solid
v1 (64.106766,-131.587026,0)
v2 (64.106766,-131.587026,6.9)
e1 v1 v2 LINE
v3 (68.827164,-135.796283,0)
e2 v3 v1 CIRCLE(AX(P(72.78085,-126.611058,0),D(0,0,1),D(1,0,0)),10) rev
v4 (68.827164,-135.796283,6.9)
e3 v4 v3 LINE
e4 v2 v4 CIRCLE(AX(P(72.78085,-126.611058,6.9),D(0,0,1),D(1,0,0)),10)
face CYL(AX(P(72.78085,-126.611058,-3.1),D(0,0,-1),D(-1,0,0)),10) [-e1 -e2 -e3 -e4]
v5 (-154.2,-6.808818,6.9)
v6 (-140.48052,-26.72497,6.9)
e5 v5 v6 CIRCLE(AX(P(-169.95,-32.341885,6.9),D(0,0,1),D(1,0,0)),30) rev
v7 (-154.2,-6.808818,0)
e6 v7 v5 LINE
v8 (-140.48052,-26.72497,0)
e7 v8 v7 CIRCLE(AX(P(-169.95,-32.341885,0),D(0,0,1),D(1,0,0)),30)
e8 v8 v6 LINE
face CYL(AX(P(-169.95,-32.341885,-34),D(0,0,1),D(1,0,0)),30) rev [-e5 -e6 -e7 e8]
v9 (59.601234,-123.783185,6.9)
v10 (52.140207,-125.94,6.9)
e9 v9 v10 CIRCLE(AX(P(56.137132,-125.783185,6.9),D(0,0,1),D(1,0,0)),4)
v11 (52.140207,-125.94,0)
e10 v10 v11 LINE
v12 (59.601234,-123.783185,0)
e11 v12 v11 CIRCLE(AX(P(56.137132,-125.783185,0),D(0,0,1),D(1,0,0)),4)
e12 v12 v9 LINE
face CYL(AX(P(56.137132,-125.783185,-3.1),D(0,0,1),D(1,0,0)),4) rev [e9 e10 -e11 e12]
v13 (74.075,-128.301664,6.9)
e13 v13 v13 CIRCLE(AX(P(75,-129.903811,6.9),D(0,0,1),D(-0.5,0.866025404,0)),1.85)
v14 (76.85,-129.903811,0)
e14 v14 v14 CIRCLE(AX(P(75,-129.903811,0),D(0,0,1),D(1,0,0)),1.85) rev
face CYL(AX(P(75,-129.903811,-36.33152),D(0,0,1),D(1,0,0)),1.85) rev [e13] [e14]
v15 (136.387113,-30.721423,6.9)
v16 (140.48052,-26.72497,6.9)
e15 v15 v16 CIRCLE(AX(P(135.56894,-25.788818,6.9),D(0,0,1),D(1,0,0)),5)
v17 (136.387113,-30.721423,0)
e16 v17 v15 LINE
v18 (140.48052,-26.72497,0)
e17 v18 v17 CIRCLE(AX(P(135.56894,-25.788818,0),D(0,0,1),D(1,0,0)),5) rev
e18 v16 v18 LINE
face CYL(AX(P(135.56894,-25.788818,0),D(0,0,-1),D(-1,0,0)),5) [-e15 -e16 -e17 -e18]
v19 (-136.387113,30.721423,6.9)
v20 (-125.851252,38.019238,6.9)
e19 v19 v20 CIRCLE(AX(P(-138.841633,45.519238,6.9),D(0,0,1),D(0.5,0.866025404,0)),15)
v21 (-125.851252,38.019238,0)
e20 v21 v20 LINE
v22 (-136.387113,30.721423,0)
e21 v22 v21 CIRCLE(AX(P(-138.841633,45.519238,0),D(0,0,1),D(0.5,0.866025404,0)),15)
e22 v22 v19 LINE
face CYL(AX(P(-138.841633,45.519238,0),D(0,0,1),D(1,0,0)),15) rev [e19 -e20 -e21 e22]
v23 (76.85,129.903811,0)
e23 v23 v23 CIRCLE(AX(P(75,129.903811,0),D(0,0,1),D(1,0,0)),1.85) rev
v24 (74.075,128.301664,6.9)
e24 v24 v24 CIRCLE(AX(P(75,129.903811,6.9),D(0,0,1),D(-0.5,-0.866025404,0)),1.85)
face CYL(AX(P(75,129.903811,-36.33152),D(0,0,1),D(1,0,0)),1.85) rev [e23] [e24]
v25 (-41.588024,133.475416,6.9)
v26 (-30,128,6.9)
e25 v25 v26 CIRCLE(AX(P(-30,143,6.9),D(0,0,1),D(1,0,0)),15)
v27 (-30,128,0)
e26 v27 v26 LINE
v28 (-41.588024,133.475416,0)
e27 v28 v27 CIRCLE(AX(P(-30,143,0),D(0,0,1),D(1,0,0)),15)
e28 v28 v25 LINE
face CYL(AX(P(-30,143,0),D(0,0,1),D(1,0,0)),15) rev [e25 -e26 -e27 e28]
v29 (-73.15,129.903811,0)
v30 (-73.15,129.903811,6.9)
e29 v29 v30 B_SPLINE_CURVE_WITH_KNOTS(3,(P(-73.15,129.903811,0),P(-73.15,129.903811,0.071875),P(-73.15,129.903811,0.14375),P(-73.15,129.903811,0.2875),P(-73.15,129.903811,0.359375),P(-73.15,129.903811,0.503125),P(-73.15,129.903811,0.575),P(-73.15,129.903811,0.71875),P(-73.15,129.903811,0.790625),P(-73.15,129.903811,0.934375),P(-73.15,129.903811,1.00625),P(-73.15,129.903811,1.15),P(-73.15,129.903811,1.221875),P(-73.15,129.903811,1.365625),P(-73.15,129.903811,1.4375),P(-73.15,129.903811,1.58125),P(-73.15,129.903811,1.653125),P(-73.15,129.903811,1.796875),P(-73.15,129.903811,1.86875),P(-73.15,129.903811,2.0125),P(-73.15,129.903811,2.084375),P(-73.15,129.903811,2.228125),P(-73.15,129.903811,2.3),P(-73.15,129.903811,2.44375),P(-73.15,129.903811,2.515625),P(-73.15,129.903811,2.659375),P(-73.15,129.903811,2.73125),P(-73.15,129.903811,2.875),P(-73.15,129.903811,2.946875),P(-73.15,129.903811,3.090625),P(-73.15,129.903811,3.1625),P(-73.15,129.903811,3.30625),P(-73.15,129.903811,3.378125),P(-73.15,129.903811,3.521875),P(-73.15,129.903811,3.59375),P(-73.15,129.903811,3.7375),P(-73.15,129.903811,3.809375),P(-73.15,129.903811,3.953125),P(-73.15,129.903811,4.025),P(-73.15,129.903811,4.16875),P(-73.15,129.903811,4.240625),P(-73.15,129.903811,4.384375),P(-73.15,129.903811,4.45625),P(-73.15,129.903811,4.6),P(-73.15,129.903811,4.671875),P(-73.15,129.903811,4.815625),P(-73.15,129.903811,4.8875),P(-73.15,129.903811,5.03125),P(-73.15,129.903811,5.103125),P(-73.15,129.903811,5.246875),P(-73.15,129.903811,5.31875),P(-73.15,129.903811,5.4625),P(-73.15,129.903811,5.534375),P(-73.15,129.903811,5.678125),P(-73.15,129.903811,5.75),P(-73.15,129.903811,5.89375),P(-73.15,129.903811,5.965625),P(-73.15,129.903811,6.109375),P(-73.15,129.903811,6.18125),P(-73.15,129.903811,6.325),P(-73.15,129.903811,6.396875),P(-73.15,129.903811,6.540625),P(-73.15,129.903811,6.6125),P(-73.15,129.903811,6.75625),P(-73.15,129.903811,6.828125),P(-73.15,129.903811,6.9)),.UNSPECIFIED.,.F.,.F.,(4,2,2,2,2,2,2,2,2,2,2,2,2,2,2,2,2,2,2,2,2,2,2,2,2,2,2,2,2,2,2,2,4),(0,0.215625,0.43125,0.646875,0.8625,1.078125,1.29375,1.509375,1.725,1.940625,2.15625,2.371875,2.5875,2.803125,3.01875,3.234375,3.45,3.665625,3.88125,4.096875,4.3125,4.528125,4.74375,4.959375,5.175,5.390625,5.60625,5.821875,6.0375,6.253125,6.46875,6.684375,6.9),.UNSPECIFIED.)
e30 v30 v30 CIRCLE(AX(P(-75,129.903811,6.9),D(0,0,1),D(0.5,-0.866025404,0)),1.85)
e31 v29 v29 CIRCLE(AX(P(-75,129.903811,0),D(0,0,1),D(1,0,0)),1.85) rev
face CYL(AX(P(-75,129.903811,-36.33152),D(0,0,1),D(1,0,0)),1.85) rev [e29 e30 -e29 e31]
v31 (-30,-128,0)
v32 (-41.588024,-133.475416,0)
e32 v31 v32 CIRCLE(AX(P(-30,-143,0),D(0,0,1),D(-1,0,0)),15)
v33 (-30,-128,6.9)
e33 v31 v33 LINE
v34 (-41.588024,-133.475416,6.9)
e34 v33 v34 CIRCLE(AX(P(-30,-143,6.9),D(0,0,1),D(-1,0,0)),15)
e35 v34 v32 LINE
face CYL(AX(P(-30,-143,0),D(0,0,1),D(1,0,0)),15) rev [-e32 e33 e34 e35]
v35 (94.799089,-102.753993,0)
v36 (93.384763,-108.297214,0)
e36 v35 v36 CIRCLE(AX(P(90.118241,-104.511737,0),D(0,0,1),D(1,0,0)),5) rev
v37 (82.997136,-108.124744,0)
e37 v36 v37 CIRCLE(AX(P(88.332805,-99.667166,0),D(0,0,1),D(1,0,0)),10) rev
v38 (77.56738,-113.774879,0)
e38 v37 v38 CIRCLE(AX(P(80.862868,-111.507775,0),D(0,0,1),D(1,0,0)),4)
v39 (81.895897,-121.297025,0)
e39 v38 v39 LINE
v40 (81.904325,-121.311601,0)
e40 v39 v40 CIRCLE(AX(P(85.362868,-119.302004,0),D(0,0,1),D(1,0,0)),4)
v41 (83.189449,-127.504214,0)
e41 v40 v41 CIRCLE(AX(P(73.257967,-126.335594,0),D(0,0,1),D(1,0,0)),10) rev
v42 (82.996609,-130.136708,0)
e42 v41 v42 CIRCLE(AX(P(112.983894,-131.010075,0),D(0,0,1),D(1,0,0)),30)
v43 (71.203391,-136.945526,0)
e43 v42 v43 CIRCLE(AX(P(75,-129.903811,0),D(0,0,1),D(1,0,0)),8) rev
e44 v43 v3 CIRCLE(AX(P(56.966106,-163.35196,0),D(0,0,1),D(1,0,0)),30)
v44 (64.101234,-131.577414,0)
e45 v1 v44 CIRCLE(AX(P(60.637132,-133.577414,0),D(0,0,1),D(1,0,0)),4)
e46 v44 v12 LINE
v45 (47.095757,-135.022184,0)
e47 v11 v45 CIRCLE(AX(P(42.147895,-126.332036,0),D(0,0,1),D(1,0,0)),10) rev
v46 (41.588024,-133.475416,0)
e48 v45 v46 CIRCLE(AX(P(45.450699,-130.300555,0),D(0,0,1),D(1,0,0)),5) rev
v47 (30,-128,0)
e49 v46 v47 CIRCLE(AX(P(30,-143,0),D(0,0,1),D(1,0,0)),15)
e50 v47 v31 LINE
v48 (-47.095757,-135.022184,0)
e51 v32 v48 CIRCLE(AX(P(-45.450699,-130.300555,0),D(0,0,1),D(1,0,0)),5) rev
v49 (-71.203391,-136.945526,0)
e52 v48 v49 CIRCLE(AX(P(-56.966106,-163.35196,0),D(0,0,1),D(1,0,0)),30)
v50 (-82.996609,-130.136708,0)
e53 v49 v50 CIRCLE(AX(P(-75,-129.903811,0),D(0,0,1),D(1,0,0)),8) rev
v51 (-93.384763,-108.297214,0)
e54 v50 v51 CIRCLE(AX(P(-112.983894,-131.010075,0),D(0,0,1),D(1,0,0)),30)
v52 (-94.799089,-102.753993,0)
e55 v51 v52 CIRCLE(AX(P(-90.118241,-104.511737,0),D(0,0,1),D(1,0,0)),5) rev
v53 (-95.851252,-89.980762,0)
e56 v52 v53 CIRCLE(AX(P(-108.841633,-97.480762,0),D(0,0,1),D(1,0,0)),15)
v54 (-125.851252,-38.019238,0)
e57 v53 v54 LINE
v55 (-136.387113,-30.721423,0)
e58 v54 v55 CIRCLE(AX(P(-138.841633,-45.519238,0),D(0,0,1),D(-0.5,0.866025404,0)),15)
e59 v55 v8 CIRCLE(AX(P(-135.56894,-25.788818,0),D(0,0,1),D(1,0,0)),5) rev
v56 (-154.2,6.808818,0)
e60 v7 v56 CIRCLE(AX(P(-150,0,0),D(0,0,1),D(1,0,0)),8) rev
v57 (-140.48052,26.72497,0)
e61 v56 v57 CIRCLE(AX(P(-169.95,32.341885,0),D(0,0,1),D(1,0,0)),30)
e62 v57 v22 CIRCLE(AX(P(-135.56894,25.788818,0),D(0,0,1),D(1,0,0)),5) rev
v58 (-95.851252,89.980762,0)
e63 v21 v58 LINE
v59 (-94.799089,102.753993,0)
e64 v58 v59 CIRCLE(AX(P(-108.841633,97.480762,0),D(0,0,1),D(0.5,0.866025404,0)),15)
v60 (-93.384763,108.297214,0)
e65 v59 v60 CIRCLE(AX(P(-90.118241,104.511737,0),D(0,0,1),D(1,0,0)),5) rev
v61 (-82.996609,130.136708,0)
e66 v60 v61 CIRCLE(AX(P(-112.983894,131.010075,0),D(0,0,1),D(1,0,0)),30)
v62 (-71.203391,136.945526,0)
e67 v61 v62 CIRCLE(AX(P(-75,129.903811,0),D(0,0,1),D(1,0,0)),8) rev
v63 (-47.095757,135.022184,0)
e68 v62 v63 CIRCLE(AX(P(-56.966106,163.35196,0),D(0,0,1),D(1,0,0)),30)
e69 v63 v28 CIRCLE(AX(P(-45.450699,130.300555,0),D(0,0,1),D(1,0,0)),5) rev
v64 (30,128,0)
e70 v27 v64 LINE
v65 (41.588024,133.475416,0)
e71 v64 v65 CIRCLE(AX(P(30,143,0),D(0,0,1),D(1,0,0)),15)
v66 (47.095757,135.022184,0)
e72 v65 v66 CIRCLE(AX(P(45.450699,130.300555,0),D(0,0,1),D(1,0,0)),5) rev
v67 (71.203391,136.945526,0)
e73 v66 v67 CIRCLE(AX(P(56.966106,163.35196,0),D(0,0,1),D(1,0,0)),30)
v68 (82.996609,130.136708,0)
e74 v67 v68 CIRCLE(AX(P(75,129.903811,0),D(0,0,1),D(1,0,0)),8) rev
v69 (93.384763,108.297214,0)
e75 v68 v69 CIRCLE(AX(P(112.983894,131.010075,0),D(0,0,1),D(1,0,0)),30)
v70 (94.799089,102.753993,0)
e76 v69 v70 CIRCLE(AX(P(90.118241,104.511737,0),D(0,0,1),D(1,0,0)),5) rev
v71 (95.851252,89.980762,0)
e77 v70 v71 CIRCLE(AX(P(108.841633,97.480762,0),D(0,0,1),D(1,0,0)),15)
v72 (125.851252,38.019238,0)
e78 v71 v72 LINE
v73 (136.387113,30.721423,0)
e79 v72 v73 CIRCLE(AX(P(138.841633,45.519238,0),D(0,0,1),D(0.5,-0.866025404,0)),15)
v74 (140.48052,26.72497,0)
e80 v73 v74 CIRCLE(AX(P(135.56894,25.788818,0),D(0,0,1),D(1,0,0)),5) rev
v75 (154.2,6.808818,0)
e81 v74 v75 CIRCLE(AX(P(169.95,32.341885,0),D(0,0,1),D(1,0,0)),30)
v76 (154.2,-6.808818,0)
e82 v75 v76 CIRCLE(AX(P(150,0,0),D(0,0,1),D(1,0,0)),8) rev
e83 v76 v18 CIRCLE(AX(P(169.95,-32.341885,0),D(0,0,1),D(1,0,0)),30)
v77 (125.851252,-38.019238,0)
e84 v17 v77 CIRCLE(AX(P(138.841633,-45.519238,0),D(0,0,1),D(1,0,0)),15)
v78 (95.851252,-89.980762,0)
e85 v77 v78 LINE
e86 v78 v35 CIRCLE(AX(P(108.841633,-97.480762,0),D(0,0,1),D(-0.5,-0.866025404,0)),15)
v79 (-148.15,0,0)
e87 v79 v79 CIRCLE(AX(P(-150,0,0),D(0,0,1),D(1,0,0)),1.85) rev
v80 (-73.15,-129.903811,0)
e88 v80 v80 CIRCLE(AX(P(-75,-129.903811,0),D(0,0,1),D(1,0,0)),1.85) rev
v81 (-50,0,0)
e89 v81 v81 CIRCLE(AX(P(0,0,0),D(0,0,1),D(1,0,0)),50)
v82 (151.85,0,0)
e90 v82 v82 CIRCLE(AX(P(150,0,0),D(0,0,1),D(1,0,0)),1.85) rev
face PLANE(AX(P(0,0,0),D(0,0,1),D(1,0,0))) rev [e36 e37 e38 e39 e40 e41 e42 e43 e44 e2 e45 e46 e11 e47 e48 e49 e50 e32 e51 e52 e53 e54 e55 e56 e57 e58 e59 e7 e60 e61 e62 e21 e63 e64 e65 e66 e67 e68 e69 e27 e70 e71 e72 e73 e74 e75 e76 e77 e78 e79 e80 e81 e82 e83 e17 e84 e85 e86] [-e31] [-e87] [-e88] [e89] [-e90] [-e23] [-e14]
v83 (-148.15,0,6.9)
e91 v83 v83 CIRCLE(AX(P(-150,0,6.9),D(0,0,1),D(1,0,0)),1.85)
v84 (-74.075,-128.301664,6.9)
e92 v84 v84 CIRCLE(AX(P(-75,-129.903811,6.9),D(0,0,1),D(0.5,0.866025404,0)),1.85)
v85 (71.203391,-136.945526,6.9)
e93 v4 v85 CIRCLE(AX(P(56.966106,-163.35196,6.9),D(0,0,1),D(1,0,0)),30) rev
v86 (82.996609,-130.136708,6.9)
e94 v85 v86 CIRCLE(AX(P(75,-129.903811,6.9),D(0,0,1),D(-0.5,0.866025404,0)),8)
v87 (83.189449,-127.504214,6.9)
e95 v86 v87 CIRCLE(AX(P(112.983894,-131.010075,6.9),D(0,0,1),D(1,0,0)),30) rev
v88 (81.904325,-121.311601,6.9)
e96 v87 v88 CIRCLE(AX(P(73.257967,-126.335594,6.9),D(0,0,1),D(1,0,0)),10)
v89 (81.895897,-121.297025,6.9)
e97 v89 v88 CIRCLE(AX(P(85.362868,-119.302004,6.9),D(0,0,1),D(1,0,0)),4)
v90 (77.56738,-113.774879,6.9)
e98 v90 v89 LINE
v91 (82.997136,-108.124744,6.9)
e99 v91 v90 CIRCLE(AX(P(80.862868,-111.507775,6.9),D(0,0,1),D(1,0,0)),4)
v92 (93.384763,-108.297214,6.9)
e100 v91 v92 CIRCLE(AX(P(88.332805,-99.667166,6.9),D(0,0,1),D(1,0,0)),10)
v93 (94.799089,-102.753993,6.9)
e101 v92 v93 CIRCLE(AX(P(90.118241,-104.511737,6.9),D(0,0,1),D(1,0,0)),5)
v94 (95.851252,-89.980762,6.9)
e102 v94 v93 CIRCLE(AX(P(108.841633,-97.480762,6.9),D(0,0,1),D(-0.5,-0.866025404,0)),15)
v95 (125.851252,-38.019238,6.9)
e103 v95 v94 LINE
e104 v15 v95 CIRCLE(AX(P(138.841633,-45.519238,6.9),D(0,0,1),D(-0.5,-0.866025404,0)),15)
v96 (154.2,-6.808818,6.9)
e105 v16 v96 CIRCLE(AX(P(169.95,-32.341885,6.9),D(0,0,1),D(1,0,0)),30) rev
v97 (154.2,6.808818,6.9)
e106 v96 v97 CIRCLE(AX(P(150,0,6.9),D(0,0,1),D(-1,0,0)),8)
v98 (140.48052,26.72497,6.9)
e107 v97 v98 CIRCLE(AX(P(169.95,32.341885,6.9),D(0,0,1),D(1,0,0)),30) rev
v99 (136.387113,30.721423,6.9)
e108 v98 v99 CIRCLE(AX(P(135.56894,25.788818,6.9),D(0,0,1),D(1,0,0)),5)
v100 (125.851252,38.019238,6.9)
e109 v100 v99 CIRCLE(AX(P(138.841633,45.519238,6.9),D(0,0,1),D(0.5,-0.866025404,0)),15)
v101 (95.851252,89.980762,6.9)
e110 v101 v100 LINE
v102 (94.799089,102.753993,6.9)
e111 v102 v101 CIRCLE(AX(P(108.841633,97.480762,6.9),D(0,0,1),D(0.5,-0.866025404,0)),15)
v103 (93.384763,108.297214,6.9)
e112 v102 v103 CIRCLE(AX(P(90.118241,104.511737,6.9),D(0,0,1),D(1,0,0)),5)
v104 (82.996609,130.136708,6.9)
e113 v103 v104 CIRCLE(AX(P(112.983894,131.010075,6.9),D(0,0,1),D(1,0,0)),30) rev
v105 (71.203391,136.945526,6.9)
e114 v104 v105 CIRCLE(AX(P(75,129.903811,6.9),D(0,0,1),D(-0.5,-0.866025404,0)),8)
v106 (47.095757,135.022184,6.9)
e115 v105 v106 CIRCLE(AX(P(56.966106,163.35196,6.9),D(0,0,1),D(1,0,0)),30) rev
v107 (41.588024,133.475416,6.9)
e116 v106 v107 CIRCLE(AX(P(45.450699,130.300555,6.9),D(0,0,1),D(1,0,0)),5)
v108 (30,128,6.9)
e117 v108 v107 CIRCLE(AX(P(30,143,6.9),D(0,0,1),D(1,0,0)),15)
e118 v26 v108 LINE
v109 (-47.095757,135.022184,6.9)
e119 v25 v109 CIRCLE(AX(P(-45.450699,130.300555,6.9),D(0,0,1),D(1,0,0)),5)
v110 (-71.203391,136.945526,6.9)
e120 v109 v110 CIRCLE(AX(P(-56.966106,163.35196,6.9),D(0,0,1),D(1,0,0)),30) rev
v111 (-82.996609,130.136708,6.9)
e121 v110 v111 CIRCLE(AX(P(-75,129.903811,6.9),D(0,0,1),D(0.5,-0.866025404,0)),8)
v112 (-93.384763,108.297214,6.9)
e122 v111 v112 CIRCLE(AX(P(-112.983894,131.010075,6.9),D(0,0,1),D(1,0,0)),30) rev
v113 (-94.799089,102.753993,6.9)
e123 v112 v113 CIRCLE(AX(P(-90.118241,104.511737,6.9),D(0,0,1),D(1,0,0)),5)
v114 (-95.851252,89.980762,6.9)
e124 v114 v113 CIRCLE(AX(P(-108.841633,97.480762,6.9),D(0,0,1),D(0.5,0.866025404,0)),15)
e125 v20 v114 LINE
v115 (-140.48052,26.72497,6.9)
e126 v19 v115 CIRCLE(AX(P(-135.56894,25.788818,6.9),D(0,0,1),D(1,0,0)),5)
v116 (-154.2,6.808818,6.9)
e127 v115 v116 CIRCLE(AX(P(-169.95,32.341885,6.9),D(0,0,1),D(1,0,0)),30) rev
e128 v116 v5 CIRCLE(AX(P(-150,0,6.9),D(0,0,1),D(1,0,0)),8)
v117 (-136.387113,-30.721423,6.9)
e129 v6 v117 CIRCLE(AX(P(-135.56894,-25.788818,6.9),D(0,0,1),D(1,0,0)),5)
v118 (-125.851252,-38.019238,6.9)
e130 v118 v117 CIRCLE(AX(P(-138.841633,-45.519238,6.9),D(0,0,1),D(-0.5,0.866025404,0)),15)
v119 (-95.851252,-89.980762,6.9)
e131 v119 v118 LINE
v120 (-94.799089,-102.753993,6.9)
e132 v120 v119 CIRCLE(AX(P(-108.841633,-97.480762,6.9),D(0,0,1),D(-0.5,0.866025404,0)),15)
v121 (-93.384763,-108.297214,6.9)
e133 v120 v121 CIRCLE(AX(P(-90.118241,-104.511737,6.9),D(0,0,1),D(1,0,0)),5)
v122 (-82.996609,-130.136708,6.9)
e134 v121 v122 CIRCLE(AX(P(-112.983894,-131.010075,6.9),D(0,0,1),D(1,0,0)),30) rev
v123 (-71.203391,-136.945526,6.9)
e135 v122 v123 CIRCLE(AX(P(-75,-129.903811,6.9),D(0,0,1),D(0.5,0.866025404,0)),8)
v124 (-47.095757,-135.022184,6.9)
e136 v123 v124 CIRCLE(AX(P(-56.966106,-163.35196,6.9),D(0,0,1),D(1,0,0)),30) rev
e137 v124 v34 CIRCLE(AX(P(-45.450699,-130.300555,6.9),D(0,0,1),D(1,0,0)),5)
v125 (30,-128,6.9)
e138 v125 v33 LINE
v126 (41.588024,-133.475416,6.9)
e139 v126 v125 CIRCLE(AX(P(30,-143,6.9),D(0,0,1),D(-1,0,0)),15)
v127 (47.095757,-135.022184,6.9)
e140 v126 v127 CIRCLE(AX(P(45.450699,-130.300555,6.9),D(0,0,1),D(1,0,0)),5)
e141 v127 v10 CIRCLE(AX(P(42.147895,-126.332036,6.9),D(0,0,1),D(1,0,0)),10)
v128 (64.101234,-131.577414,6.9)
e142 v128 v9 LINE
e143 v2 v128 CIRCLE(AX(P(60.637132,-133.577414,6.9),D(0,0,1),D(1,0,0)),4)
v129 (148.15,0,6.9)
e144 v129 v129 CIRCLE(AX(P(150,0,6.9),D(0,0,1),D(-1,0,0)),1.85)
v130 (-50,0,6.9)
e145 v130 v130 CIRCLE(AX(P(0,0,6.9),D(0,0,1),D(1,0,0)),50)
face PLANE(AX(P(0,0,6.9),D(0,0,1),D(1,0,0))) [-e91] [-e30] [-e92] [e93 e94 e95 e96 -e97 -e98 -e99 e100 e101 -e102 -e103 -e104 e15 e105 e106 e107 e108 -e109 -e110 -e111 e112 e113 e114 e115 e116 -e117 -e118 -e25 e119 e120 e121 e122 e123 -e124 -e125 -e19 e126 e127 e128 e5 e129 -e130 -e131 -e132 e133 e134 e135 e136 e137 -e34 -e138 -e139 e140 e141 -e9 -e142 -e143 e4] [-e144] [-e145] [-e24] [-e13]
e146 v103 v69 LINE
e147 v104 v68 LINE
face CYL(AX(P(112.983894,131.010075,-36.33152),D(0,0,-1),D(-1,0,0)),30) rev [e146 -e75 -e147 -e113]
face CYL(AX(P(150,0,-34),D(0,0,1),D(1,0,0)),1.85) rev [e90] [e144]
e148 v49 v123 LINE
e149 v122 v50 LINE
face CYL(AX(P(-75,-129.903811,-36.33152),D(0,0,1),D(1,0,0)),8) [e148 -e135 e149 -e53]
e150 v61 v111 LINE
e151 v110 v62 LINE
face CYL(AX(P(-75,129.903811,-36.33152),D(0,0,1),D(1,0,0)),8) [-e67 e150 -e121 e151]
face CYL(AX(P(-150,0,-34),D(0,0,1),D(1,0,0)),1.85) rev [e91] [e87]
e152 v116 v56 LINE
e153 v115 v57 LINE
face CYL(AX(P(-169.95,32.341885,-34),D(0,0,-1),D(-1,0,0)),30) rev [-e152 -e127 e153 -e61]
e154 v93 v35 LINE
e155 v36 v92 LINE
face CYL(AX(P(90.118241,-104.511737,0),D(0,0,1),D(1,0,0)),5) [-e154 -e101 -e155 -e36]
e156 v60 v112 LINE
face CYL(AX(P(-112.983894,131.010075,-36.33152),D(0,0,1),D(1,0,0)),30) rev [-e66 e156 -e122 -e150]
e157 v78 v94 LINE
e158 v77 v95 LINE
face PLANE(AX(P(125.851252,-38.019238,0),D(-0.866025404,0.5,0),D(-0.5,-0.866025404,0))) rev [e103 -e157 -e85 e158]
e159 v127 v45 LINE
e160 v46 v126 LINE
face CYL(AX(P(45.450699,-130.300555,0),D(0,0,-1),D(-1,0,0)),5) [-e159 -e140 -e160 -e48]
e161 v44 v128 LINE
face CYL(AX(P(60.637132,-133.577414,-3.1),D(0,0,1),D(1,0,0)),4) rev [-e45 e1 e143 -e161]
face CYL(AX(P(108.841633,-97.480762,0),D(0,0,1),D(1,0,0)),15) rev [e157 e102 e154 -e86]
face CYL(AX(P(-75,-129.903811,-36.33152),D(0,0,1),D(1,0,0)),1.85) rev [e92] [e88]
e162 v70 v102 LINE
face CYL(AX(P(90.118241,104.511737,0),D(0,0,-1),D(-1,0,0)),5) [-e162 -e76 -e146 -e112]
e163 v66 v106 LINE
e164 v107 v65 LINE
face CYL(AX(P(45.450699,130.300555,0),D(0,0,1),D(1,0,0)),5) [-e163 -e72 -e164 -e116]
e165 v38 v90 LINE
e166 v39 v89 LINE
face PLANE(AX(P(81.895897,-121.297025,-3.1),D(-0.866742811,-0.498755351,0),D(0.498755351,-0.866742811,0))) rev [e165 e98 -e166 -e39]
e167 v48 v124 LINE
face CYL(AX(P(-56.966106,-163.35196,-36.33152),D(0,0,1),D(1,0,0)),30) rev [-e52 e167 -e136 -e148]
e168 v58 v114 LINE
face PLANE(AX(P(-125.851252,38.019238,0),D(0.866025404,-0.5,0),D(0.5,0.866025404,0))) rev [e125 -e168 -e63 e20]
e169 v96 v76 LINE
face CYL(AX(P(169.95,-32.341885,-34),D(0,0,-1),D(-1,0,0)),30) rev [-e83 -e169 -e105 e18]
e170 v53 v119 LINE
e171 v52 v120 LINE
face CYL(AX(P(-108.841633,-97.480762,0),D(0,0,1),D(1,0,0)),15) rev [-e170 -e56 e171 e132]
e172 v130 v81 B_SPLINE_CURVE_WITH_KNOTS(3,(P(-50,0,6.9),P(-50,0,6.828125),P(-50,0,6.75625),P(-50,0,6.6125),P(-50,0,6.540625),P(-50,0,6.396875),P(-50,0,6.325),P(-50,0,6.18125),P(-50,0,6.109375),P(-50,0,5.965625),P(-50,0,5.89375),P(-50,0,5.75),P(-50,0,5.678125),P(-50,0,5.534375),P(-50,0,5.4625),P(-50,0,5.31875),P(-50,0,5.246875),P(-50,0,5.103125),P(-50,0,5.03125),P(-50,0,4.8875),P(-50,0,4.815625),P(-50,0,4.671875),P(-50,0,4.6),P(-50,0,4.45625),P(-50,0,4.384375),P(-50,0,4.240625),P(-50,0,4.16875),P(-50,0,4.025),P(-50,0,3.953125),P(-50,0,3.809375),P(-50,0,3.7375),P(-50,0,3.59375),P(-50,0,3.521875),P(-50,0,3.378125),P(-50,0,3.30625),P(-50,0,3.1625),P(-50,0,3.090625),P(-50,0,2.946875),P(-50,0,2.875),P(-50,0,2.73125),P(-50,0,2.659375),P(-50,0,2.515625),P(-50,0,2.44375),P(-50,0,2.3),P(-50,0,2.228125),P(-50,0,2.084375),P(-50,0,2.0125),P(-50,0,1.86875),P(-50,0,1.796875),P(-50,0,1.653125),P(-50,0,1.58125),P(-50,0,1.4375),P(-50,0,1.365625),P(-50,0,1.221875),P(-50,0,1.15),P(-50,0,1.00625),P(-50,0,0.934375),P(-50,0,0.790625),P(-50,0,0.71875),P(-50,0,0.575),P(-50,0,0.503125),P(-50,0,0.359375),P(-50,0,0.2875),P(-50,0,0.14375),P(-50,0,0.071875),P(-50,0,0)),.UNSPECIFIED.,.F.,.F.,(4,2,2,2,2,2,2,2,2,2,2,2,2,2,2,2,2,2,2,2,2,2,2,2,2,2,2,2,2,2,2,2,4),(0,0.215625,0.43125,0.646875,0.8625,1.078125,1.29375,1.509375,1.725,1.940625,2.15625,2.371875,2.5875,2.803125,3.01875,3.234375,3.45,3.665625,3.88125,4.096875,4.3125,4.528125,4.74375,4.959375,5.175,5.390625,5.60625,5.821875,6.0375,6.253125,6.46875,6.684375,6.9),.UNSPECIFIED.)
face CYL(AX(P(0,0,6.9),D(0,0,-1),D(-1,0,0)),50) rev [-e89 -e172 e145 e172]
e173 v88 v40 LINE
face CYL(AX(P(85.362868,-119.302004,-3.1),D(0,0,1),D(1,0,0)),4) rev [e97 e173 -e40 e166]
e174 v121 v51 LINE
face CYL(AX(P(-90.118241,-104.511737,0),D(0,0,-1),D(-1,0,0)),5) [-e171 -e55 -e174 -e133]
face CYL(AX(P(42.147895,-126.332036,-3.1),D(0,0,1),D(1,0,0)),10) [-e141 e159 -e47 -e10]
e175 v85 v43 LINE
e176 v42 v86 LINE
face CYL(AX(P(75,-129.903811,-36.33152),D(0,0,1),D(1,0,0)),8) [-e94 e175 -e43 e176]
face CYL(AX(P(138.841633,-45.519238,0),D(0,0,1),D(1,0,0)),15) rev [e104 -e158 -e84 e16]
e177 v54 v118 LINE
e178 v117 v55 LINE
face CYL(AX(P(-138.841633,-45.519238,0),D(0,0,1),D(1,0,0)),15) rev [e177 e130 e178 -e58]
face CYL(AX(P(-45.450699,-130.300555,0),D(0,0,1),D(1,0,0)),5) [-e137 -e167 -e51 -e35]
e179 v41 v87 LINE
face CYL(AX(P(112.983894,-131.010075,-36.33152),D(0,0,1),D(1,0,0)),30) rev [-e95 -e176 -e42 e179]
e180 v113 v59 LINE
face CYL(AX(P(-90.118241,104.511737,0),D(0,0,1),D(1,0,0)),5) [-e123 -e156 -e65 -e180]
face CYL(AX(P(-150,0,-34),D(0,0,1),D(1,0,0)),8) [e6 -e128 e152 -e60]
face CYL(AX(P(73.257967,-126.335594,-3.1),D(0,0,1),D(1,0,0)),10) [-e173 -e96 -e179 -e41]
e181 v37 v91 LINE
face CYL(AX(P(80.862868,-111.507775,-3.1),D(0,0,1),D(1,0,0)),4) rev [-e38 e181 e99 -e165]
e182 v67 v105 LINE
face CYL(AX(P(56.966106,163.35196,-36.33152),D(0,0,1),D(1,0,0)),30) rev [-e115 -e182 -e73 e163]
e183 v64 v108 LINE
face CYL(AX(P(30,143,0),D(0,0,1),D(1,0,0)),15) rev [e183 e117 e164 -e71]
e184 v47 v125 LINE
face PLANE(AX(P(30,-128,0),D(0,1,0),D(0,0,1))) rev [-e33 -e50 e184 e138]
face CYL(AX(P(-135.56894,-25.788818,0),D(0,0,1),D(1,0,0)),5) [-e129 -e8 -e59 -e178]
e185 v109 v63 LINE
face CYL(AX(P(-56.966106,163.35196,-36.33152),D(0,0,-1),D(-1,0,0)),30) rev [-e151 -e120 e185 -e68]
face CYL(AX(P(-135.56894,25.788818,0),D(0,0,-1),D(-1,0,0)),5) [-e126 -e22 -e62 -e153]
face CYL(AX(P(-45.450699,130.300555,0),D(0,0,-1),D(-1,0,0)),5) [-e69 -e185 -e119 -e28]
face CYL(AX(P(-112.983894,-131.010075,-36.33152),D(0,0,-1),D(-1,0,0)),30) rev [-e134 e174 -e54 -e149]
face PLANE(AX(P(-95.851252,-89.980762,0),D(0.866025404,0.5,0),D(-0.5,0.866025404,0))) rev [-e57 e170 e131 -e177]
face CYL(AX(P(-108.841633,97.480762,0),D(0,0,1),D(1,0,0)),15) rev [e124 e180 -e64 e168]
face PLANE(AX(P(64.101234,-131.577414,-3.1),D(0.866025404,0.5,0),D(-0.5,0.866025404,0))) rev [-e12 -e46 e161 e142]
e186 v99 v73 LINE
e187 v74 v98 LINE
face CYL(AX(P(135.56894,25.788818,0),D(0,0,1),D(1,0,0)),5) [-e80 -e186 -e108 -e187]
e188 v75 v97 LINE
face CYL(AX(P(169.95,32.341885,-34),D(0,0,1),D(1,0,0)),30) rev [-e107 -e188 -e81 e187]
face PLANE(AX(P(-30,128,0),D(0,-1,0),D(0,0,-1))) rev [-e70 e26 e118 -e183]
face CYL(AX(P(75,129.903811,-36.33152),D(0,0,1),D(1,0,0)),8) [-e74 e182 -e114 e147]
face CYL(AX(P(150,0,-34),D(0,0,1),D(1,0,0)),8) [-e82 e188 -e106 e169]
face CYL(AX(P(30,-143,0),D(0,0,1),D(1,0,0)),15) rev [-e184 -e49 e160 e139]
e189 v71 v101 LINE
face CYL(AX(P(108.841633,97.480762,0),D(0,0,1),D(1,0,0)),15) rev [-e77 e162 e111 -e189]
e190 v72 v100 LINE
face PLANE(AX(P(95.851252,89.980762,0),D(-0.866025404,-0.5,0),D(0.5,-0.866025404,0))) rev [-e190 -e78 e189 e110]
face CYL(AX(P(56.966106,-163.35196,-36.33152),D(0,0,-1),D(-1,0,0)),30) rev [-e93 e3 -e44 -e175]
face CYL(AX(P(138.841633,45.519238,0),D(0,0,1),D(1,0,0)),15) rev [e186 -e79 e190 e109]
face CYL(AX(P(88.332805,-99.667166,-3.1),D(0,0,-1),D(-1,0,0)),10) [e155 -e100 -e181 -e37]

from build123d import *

# Parameters (mm, degrees)
SKETCH1_R                = 143
SKETCH1_R_2              = 50
BOSS_EXTRUDE1_DEPTH      = 6.9
SKETCH2_R                = 1.85
BOSS_EXTRUDE2_DEPTH      = 6.9
FILLET1_R                = 30
CIRPATTERN1_COUNT        = 6
FILLET1_OF_CIRPATTERN1_R = 30
CUT_EXTRUDE1_DEPTH       = 214.214938645
FILLET3_R                = 5
CIRPATTERN2_COUNT        = 6
FILLET3_OF_CIRPATTERN2_R = 5
CUT_EXTRUDE2_DEPTH       = 10
FILLET4_R                = 10
FILLET5_START            = -1
FILLET5_DEPTH            = 9


with BuildPart() as part:
    # Sketch1 → Boss-Extrude1 (new body)
    with BuildSketch(Plane.XY):
        with Locations(Location((0, 0, 0), (0, 0, 180))):
            Circle(SKETCH1_R)
        with Locations(Location((0, 0, 0), (0, 0, 180))):
            Circle(SKETCH1_R_2, mode=Mode.SUBTRACT)
    extrude(amount=BOSS_EXTRUDE1_DEPTH)

    # Sketch2 → Boss-Extrude2 (add)
    with BuildSketch(Plane.XY.offset(6.9)):
        with BuildLine():
            Line((-136, -8), (-150, -8))
            ThreePointArc((-150, -8), (-158, 0), (-150, 8))
            Line((-150, 8), (-136, 8))
            ThreePointArc((-136, 8), (-128, 0), (-136, -8))
        make_face()
        with Locations((-150, 0)):
            Circle(SKETCH2_R, mode=Mode.SUBTRACT)
    boss_extrude2 = extrude(amount=-BOSS_EXTRUDE2_DEPTH)

    # Fillet1
    fillet1_edges = [part.edges().sort_by_distance(p)[0] for p in [
        (-142.776048411, 8, 3.45),
        (-142.776048411, -8, 3.45),
    ]]
    fillet(fillet1_edges, radius=FILLET1_R)

    # CirPattern1: Boss-Extrude2 ×6 about axis
    cirpattern1_axis = Axis((0, 0, 0), (0, 0, 1))
    for i in range(1, CIRPATTERN1_COUNT):
        add(boss_extrude2.rotate(cirpattern1_axis, i * 360 / CIRPATTERN1_COUNT))

    # Fillet1 of CirPattern1
    fillet1_of_cirpattern1_edges = [part.edges().sort_by_distance(p)[0] for p in [
        (-78.316227436, -119.647684976, 3.45),
        (-64.459820975, -127.647684976, 3.45),
        (64.459820975, -127.647684976, 3.45),
        (78.316227436, -119.647684976, 3.45),
        (142.776048411, -8, 3.45),
        (142.776048411, 8, 3.45),
        (78.316227436, 119.647684976, 3.45),
        (64.459820975, 127.647684976, 3.45),
        (-64.459820975, 127.647684976, 3.45),
        (-78.316227436, 119.647684976, 3.45),
    ]]
    fillet(fillet1_of_cirpattern1_edges, radius=FILLET1_OF_CIRPATTERN1_R)

    # Sketch7 → Cut-Extrude1 (cut, through all)
    with BuildSketch(Plane.XY.offset(6.9)):
        with BuildLine():
            Line((-30, 158), (30, 158))
            ThreePointArc((30, 158), (45, 143), (30, 128))
            Line((30, 128), (-30, 128))
            ThreePointArc((-30, 128), (-45, 143), (-30, 158))
        make_face()
    cut_extrude1 = extrude(amount=-CUT_EXTRUDE1_DEPTH, mode=Mode.SUBTRACT)

    # Fillet3
    fillet3_edges = [part.edges().sort_by_distance(p)[0] for p in [
        (43.398254251, 136.255610996, 3.45),
        (-43.398254251, 136.255610996, 3.45),
    ]]
    fillet(fillet3_edges, radius=FILLET3_R)

    # CirPattern2: Cut-Extrude1 ×6 about axis
    cirpattern2_axis = Axis((0, 0, 0), (0, 0, 1))
    for i in range(1, CIRPATTERN2_COUNT):
        add(cut_extrude1.rotate(cirpattern2_axis, i * 360 / CIRPATTERN2_COUNT), mode=Mode.SUBTRACT)

    # Fillet3 of CirPattern2
    fillet3_of_cirpattern2_edges = [part.edges().sort_by_distance(p)[0] for p in [
        (-96.301693406, 105.711796159, 3.45),
        (-139.699947656, 30.543814837, 3.45),
        (-139.699947656, -30.543814837, 3.45),
        (-96.301693406, -105.711796159, 3.45),
        (-43.398254251, -136.255610996, 3.45),
        (43.398254251, -136.255610996, 3.45),
        (96.301693406, -105.711796159, 3.45),
        (139.699947656, -30.543814837, 3.45),
        (139.699947656, 30.543814837, 3.45),
        (96.301693406, 105.711796159, 3.45),
    ]]
    fillet(fillet3_of_cirpattern2_edges, radius=FILLET3_OF_CIRPATTERN2_R)

    # Sketch8 → Cut-Extrude2 (cut)
    with BuildSketch(Plane.XY.offset(6.9)):
        with BuildLine():
            Line((88.826969439, -117.302003887), (84.326969439, -109.507775253))
            ThreePointArc((84.326969439, -109.507775253), (78.727650946, -108.125342861), (77.567379868, -113.774878941))
            Line((77.567379868, -113.774878941), (81.895896581, -121.29702529))
            ThreePointArc((81.895896581, -121.29702529), (87.360379041, -122.76754121), (88.826969439, -117.302003887))
        make_face()
        with BuildLine():
            Line((64.101233792, -131.577414018), (59.601233792, -123.783185384))
            ThreePointArc((59.601233792, -123.783185384), (54.136918717, -122.319207019), (52.673277073, -127.783612295))
            Line((52.673277073, -127.783612295), (57.221343973, -135.658853653))
            ThreePointArc((57.221343973, -135.658853653), (62.677994964, -137.017599926), (64.101233792, -131.577414018))
        make_face()
    extrude(amount=-CUT_EXTRUDE2_DEPTH, mode=Mode.SUBTRACT)

    # Fillet4
    fillet4_edges = [part.edges().sort_by_distance(p)[0] for p in [
        (64.565608345, -134.330457838, 3.45),
        (84.050784817, -123.080685956, 3.45),
    ]]
    fillet(fillet4_edges, radius=FILLET4_R)

    # Fillet5: read off the stored shape, not the designer's step
    # Fillet5 outline → Fillet5 (cut)
    with BuildSketch(Plane.XY.offset(FILLET5_START)):
        with BuildLine():
            ThreePointArc((87.553061033, -115.095529803), (90.213766815, -111.477504252), (93.384762884, -108.297213687))
            ThreePointArc((93.384762884, -108.297213687), (88.166794559, -109.665787745), (82.997135719, -108.124743986))
            ThreePointArc((82.997135719, -108.124743986), (83.746204288, -108.73534476), (84.326969439, -109.507775253))
            Line((84.326969439, -109.507775253), (87.553061033, -115.095529803))
        make_face()
        with BuildLine():
            ThreePointArc((52.14020721, -125.939999968), (50.889960833, -131.187577731), (47.09575677, -135.022183827))
            ThreePointArc((47.09575677, -135.022183827), (51.435909668, -133.866082974), (55.900021902, -133.370907928))
            Line((55.900021902, -133.370907928), (52.673277073, -127.783612295))
            ThreePointArc((52.673277073, -127.783612295), (52.294537166, -126.894249553), (52.14020721, -125.939999968))
        make_face()
    extrude(amount=FILLET5_DEPTH, mode=Mode.SUBTRACT)


solid = part.part
